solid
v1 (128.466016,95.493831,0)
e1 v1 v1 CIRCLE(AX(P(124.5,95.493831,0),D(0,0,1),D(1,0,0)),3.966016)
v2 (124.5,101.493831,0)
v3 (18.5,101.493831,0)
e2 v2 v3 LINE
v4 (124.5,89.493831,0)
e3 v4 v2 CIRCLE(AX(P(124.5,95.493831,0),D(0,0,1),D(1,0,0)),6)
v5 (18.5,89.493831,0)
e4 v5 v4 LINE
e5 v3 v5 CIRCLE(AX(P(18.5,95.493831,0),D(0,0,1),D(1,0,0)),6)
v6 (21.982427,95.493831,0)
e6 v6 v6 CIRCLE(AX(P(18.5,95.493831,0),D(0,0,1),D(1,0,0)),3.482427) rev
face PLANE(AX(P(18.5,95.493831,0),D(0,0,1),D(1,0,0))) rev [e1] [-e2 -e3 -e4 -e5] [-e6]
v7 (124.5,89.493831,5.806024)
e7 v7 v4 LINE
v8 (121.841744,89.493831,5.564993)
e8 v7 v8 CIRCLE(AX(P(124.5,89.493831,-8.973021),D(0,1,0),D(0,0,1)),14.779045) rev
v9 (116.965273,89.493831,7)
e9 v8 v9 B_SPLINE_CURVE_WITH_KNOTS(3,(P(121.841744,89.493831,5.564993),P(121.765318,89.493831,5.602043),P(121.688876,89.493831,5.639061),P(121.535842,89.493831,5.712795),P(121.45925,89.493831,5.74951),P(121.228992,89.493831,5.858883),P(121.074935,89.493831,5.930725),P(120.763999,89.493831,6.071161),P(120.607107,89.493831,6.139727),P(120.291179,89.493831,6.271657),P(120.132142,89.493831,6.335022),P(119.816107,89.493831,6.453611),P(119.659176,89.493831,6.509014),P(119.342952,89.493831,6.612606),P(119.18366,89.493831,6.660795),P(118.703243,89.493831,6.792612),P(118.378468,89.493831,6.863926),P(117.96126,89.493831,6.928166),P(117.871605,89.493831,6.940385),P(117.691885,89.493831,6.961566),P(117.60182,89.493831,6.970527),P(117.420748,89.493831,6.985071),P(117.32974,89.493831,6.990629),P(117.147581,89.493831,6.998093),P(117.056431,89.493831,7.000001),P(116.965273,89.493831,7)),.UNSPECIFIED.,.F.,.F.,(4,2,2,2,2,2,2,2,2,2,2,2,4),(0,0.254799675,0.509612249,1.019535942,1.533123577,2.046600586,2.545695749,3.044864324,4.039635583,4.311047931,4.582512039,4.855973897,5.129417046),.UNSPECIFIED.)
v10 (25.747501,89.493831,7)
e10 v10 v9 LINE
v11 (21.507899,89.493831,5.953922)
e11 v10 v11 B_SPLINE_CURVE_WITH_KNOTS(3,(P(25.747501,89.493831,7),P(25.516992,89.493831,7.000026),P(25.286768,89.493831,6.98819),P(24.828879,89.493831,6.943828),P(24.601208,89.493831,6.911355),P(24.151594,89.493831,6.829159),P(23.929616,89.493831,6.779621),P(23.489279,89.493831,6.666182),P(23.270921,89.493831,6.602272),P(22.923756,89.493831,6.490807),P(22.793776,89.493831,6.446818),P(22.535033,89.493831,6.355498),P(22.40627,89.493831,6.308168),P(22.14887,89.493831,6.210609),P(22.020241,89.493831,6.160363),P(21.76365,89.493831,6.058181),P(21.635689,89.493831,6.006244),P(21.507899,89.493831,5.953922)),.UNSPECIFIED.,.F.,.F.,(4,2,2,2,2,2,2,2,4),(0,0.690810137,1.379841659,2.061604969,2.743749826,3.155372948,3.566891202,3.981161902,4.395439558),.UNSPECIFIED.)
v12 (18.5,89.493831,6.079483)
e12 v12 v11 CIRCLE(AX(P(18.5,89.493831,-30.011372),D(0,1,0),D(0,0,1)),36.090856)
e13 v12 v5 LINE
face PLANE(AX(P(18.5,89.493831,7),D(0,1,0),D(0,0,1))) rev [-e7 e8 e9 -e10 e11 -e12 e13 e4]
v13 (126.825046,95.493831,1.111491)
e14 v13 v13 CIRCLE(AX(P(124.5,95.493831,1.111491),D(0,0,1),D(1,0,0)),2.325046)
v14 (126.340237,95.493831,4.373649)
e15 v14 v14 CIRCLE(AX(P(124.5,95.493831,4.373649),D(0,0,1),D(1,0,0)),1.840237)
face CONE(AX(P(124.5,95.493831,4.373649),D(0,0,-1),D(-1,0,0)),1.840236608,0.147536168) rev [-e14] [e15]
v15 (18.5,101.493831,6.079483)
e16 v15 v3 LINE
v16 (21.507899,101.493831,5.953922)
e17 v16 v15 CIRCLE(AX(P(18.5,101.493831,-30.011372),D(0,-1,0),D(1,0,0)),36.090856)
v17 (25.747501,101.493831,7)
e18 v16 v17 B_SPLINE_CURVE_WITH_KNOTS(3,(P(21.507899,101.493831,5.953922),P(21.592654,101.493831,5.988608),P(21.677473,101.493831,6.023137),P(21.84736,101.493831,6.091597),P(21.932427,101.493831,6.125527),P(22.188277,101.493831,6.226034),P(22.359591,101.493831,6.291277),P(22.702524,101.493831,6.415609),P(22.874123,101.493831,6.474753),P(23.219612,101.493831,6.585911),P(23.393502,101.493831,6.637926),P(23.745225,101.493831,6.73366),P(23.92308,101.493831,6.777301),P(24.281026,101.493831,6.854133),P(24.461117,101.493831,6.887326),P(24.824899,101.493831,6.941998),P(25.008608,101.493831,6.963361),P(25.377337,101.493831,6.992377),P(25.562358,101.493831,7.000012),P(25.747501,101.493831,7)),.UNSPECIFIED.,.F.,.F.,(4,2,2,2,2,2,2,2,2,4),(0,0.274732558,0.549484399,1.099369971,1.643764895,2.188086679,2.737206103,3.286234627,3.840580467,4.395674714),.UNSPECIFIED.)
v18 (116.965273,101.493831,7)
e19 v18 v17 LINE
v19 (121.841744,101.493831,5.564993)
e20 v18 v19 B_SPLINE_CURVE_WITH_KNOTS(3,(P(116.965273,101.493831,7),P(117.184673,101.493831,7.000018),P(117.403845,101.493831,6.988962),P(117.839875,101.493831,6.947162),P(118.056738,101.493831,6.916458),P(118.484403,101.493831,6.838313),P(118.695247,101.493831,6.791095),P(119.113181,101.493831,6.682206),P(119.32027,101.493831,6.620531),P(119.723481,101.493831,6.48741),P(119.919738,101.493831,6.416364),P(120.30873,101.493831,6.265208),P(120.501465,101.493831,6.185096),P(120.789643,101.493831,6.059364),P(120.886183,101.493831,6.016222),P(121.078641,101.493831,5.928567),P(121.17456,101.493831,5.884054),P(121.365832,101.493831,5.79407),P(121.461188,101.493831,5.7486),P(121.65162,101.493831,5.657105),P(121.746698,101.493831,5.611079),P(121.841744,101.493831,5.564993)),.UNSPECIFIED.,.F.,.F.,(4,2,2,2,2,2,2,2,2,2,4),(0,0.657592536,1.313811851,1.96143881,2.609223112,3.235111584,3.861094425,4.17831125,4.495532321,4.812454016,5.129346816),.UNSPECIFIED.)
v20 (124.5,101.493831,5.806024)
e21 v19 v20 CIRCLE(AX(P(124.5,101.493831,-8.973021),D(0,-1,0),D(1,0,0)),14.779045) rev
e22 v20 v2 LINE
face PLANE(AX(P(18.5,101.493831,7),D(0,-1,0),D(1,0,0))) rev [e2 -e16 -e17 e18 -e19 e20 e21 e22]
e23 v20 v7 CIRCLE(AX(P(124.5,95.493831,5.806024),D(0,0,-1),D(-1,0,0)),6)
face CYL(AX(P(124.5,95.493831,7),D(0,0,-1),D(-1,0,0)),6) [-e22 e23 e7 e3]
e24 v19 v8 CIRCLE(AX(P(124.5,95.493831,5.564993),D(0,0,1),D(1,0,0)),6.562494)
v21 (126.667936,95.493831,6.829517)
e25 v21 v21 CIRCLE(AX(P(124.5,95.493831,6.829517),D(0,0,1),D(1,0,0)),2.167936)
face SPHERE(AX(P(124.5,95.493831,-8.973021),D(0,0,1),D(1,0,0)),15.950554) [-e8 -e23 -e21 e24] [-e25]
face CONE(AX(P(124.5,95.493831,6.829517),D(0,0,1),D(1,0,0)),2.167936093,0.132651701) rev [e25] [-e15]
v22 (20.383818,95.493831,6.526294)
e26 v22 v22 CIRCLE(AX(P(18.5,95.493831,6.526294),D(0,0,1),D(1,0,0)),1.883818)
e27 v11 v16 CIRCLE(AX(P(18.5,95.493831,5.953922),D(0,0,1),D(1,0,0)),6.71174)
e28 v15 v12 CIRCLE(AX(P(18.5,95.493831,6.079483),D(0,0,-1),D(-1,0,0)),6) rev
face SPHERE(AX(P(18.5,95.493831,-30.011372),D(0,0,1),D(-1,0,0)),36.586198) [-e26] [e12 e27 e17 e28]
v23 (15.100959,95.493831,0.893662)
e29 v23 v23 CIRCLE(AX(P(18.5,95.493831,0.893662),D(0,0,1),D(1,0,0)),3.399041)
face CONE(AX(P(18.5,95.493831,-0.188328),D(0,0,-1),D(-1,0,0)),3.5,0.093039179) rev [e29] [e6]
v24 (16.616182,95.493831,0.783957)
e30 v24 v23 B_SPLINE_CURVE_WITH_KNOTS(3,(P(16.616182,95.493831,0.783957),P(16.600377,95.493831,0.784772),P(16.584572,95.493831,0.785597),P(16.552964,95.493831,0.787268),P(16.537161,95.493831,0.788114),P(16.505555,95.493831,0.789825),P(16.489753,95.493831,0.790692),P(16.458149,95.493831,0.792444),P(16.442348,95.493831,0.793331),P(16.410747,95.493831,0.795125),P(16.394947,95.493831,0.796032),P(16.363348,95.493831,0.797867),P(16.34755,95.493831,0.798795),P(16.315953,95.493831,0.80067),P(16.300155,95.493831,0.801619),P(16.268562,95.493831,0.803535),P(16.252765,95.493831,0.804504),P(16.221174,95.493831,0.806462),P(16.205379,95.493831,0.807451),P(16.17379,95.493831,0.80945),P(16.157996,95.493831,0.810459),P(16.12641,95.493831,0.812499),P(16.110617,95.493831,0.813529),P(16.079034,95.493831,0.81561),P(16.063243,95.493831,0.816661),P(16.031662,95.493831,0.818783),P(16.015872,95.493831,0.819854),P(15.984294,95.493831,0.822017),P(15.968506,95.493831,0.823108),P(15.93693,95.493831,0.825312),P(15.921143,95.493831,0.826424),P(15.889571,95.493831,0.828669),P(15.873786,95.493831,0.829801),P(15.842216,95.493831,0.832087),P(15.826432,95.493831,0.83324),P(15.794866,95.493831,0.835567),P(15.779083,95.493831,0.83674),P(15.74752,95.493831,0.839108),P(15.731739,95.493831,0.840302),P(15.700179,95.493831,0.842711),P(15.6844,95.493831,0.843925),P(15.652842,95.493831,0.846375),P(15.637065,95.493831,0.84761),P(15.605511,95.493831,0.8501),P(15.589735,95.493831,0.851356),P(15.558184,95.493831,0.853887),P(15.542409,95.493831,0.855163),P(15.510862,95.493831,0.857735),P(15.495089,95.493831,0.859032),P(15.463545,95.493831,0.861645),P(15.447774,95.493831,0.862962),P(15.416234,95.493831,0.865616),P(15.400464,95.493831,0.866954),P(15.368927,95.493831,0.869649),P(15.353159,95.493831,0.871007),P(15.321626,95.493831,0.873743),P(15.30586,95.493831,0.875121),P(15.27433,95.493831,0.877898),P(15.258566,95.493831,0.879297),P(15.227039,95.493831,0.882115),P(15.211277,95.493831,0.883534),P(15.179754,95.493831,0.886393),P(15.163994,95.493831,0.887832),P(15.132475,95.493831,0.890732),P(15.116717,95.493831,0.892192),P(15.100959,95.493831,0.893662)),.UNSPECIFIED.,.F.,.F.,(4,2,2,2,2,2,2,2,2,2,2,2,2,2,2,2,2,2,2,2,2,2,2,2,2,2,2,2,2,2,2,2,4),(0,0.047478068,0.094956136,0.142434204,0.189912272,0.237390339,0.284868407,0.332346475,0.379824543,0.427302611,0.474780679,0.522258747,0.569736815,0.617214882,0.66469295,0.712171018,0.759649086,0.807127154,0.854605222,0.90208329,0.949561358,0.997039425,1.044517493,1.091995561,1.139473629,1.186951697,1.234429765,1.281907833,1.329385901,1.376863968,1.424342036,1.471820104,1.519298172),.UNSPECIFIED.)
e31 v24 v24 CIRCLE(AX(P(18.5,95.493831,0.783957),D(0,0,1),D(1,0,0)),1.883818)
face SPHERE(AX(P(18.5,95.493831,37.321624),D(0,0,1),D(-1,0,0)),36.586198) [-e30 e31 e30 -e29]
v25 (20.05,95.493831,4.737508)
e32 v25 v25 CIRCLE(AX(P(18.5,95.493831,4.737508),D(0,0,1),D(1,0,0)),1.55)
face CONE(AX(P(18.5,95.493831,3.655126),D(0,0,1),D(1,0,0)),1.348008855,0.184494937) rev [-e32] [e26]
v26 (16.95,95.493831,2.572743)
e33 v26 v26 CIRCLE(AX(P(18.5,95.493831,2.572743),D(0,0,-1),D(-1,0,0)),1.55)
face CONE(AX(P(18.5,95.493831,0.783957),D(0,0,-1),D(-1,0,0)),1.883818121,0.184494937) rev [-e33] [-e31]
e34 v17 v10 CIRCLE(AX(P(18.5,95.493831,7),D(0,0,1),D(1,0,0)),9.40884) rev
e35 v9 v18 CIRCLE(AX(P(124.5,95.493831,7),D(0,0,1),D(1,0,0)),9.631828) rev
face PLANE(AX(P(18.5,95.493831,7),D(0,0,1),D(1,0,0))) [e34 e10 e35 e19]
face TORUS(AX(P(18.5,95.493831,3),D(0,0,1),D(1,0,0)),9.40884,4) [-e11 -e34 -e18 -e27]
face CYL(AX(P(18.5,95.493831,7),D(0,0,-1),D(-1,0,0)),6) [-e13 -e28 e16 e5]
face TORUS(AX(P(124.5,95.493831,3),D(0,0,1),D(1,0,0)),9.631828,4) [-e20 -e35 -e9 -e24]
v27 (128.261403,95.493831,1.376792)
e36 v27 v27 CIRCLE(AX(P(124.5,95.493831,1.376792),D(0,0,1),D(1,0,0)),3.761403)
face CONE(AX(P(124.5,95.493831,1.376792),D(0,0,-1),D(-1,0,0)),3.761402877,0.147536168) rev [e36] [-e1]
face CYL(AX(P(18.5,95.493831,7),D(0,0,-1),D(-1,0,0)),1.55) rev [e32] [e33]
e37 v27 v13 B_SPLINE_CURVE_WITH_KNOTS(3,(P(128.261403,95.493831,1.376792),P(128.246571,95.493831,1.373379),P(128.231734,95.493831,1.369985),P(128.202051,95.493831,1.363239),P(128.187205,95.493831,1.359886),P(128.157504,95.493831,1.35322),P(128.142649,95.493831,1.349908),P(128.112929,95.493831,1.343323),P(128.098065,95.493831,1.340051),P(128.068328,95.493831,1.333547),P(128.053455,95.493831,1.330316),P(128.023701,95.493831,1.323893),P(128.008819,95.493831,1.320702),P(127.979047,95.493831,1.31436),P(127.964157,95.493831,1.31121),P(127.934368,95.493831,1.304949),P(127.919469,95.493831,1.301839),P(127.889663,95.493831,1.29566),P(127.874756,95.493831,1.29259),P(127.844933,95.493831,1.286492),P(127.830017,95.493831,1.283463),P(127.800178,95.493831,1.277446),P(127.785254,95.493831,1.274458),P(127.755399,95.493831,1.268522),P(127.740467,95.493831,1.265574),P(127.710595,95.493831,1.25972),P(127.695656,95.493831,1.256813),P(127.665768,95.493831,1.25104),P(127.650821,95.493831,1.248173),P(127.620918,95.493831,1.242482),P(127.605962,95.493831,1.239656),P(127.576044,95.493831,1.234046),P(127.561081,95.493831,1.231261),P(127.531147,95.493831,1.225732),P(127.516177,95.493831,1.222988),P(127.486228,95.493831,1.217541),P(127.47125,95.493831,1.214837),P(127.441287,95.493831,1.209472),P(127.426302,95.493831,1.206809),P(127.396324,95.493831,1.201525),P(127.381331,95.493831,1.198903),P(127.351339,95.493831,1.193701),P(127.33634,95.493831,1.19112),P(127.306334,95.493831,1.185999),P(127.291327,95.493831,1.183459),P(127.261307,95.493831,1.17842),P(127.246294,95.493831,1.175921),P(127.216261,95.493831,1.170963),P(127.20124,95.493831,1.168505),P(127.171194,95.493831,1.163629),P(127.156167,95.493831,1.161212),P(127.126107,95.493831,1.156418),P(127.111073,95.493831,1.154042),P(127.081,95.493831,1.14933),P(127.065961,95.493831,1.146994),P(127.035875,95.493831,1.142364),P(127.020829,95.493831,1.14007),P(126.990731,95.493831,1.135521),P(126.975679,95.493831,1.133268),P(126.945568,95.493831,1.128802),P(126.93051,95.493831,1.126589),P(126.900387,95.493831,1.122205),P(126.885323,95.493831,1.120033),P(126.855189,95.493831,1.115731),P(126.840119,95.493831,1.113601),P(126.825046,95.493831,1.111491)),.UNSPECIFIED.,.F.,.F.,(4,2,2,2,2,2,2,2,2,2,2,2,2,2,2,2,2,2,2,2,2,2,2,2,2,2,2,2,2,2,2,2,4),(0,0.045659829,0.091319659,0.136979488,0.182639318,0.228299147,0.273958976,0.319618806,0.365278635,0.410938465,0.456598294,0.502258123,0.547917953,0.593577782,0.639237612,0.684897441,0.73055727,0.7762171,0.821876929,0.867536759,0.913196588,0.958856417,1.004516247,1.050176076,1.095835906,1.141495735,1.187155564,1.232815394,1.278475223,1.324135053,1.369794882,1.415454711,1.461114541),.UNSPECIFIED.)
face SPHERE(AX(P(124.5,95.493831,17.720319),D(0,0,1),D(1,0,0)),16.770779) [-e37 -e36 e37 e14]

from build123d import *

# Parameters (mm, degrees)
SKETCH_1_R      = 1.55
EXTRUDE_1_DEPTH = 7
FILLET_1_R      = 4


with BuildPart() as part:
    # Эскиз1 → Бобышка-Вытянуть1 (new body)
    with BuildSketch(Plane.XY):
        with BuildLine():
            Line((18.5, 101.493831222), (124.5, 101.493831222))
            ThreePointArc((124.5, 101.493831222), (130.5, 95.493831222), (124.5, 89.493831222))
            Line((124.5, 89.493831222), (18.5, 89.493831222))
            ThreePointArc((18.5, 89.493831222), (12.5, 95.493831222), (18.5, 101.493831222))
        make_face()
        with Locations((124.5, 95.493831222)):
            Circle(SKETCH_1_R, mode=Mode.SUBTRACT)
        with Locations((18.5, 95.493831222)):
            Circle(SKETCH_1_R, mode=Mode.SUBTRACT)
    extrude(amount=EXTRUDE_1_DEPTH)

    # Эскиз3 → Вырез-Повернуть1 (revolve, cut)
    with BuildSketch(Plane(origin=(0, 95.493831222, 0), x_dir=(1, 0, 0), z_dir=(0, 1, 0))):
        with BuildLine():
            Line((11.788259636, -5.953922017), (11.5, -7.498579905))
            Line((11.5, -7.498579905), (18.5, -7.498579905))
            Line((18.5, -7.498579905), (18.5, -3.65512576))
            Line((18.5, -3.65512576), (18.5, 0.188328385))
            Line((18.5, 0.188328385), (15, 0.188328385))
            Line((15, 0.188328385), (15.100959011, -0.893662386))
            ThreePointArc((15.100959011, -0.893662386), (15.858000965, -0.830944257), (16.616181879, -0.783957185))
            Line((16.616181879, -0.783957185), (17.151991145, -3.65512576))
            Line((17.151991145, -3.65512576), (16.616181879, -6.526294335))
            ThreePointArc((16.616181879, -6.526294335), (14.192702827, -6.320391282), (11.788259636, -5.953922017))
        make_face()
    revolve(axis=Axis((18.5, 95.493831222, 14.092750712), (0, 0, -1)), mode=Mode.SUBTRACT)

    # Эскиз4 → Вырез-Повернуть2 (revolve, cut)
    with BuildSketch(Plane(origin=(0, 95.493831222, 0), x_dir=(1, 0, 0), z_dir=(0, 1, 0))):
        with BuildLine():
            Line((124.5, -6.829517276), (124.5, -8.843780512))
            Line((124.5, -8.843780512), (131.5, -8.843780512))
            Line((131.5, -8.843780512), (131.062493989, -5.564992503))
            ThreePointArc((131.062493989, -5.564992503), (128.910766156, -6.355557055), (126.667936093, -6.829517276))
            Line((126.667936093, -6.829517276), (126.340236608, -4.373648978))
            Line((126.340236608, -4.373648978), (126.825045666, -1.111490634))
            ThreePointArc((126.825045666, -1.111490634), (127.546113951, -1.228496574), (128.261402877, -1.37679228))
            Line((128.261402877, -1.37679228), (128.620585304, 1.040056032))
            Line((128.620585304, 1.040056032), (124.5, 1.040056032))
            Line((124.5, 1.040056032), (124.5, -0.95889034))
            Line((124.5, -0.95889034), (124.5, -4.373648978))
            Line((124.5, -4.373648978), (124.5, -6.829517276))
        make_face()
    revolve(axis=Axis((124.5, 95.493831222, 6.829517276), (0, 0, -1)), mode=Mode.SUBTRACT)

    # Скругление1
    # the kernel refuses this fillet: 4 mm, written as the material it takes off along each edge
    with BuildSketch(Plane(origin=(18.5, 95.493831222, 7), x_dir=(-0.3783138091133085, -0.9256774070021258, 0), z_dir=(-0.9256774070021258, 0.3783138091133085, 0))) as fillet_1_piece_1:
        with BuildLine():
            CenterArc((9.408839679, -4), FILLET_1_R, 90, 42.397861789)
            Line((6.711740364, -1.046077983), (6.657798378, -0.986999543))
            ThreePointArc((6.657798378, -0.986999543), (6.730706082, -0.508362986), (6.828314122, 0.014676005))
            Line((6.828314122, 0.014676005), (6.906956445, 0.08))
            Line((6.906956445, 0.08), (9.408839679, 0.08))
            Line((9.408839679, 0.08), (9.408839679, 0))
        make_face()
    revolve(axis=Axis((18.5, 95.493831222, 7), (0, 0, 1)), revolution_arc=224.458550317, mode=Mode.SUBTRACT)
    with BuildSketch(Plane(origin=(124.5, 95.493831222, 7), x_dir=(0.5555728913657687, -0.8314678360462777, 0), z_dir=(0.8314678360462777, 0.5555728913657687, 0))) as fillet_1_piece_2:
        with BuildLine():
            CenterArc((9.631828356, 4), FILLET_1_R, 219.884952178, 50.115047822)
            Line((9.631828356, 0), (9.631828356, -0.08))
            Line((9.631828356, -0.08), (6.753974623, -0.08))
            Line((6.753974623, -0.08), (6.67467745, -0.010581041))
            ThreePointArc((6.67467745, -0.010581041), (6.578937133, 0.706922708), (6.501107302, 1.383707647))
            Line((6.501107302, 1.383707647), (6.562493989, 1.435007497))
        make_face()
    revolve(axis=Axis((124.5, 95.493831222, 7), (0, 0, -1)), revolution_arc=247.500366369, mode=Mode.SUBTRACT)


solid = part.part
